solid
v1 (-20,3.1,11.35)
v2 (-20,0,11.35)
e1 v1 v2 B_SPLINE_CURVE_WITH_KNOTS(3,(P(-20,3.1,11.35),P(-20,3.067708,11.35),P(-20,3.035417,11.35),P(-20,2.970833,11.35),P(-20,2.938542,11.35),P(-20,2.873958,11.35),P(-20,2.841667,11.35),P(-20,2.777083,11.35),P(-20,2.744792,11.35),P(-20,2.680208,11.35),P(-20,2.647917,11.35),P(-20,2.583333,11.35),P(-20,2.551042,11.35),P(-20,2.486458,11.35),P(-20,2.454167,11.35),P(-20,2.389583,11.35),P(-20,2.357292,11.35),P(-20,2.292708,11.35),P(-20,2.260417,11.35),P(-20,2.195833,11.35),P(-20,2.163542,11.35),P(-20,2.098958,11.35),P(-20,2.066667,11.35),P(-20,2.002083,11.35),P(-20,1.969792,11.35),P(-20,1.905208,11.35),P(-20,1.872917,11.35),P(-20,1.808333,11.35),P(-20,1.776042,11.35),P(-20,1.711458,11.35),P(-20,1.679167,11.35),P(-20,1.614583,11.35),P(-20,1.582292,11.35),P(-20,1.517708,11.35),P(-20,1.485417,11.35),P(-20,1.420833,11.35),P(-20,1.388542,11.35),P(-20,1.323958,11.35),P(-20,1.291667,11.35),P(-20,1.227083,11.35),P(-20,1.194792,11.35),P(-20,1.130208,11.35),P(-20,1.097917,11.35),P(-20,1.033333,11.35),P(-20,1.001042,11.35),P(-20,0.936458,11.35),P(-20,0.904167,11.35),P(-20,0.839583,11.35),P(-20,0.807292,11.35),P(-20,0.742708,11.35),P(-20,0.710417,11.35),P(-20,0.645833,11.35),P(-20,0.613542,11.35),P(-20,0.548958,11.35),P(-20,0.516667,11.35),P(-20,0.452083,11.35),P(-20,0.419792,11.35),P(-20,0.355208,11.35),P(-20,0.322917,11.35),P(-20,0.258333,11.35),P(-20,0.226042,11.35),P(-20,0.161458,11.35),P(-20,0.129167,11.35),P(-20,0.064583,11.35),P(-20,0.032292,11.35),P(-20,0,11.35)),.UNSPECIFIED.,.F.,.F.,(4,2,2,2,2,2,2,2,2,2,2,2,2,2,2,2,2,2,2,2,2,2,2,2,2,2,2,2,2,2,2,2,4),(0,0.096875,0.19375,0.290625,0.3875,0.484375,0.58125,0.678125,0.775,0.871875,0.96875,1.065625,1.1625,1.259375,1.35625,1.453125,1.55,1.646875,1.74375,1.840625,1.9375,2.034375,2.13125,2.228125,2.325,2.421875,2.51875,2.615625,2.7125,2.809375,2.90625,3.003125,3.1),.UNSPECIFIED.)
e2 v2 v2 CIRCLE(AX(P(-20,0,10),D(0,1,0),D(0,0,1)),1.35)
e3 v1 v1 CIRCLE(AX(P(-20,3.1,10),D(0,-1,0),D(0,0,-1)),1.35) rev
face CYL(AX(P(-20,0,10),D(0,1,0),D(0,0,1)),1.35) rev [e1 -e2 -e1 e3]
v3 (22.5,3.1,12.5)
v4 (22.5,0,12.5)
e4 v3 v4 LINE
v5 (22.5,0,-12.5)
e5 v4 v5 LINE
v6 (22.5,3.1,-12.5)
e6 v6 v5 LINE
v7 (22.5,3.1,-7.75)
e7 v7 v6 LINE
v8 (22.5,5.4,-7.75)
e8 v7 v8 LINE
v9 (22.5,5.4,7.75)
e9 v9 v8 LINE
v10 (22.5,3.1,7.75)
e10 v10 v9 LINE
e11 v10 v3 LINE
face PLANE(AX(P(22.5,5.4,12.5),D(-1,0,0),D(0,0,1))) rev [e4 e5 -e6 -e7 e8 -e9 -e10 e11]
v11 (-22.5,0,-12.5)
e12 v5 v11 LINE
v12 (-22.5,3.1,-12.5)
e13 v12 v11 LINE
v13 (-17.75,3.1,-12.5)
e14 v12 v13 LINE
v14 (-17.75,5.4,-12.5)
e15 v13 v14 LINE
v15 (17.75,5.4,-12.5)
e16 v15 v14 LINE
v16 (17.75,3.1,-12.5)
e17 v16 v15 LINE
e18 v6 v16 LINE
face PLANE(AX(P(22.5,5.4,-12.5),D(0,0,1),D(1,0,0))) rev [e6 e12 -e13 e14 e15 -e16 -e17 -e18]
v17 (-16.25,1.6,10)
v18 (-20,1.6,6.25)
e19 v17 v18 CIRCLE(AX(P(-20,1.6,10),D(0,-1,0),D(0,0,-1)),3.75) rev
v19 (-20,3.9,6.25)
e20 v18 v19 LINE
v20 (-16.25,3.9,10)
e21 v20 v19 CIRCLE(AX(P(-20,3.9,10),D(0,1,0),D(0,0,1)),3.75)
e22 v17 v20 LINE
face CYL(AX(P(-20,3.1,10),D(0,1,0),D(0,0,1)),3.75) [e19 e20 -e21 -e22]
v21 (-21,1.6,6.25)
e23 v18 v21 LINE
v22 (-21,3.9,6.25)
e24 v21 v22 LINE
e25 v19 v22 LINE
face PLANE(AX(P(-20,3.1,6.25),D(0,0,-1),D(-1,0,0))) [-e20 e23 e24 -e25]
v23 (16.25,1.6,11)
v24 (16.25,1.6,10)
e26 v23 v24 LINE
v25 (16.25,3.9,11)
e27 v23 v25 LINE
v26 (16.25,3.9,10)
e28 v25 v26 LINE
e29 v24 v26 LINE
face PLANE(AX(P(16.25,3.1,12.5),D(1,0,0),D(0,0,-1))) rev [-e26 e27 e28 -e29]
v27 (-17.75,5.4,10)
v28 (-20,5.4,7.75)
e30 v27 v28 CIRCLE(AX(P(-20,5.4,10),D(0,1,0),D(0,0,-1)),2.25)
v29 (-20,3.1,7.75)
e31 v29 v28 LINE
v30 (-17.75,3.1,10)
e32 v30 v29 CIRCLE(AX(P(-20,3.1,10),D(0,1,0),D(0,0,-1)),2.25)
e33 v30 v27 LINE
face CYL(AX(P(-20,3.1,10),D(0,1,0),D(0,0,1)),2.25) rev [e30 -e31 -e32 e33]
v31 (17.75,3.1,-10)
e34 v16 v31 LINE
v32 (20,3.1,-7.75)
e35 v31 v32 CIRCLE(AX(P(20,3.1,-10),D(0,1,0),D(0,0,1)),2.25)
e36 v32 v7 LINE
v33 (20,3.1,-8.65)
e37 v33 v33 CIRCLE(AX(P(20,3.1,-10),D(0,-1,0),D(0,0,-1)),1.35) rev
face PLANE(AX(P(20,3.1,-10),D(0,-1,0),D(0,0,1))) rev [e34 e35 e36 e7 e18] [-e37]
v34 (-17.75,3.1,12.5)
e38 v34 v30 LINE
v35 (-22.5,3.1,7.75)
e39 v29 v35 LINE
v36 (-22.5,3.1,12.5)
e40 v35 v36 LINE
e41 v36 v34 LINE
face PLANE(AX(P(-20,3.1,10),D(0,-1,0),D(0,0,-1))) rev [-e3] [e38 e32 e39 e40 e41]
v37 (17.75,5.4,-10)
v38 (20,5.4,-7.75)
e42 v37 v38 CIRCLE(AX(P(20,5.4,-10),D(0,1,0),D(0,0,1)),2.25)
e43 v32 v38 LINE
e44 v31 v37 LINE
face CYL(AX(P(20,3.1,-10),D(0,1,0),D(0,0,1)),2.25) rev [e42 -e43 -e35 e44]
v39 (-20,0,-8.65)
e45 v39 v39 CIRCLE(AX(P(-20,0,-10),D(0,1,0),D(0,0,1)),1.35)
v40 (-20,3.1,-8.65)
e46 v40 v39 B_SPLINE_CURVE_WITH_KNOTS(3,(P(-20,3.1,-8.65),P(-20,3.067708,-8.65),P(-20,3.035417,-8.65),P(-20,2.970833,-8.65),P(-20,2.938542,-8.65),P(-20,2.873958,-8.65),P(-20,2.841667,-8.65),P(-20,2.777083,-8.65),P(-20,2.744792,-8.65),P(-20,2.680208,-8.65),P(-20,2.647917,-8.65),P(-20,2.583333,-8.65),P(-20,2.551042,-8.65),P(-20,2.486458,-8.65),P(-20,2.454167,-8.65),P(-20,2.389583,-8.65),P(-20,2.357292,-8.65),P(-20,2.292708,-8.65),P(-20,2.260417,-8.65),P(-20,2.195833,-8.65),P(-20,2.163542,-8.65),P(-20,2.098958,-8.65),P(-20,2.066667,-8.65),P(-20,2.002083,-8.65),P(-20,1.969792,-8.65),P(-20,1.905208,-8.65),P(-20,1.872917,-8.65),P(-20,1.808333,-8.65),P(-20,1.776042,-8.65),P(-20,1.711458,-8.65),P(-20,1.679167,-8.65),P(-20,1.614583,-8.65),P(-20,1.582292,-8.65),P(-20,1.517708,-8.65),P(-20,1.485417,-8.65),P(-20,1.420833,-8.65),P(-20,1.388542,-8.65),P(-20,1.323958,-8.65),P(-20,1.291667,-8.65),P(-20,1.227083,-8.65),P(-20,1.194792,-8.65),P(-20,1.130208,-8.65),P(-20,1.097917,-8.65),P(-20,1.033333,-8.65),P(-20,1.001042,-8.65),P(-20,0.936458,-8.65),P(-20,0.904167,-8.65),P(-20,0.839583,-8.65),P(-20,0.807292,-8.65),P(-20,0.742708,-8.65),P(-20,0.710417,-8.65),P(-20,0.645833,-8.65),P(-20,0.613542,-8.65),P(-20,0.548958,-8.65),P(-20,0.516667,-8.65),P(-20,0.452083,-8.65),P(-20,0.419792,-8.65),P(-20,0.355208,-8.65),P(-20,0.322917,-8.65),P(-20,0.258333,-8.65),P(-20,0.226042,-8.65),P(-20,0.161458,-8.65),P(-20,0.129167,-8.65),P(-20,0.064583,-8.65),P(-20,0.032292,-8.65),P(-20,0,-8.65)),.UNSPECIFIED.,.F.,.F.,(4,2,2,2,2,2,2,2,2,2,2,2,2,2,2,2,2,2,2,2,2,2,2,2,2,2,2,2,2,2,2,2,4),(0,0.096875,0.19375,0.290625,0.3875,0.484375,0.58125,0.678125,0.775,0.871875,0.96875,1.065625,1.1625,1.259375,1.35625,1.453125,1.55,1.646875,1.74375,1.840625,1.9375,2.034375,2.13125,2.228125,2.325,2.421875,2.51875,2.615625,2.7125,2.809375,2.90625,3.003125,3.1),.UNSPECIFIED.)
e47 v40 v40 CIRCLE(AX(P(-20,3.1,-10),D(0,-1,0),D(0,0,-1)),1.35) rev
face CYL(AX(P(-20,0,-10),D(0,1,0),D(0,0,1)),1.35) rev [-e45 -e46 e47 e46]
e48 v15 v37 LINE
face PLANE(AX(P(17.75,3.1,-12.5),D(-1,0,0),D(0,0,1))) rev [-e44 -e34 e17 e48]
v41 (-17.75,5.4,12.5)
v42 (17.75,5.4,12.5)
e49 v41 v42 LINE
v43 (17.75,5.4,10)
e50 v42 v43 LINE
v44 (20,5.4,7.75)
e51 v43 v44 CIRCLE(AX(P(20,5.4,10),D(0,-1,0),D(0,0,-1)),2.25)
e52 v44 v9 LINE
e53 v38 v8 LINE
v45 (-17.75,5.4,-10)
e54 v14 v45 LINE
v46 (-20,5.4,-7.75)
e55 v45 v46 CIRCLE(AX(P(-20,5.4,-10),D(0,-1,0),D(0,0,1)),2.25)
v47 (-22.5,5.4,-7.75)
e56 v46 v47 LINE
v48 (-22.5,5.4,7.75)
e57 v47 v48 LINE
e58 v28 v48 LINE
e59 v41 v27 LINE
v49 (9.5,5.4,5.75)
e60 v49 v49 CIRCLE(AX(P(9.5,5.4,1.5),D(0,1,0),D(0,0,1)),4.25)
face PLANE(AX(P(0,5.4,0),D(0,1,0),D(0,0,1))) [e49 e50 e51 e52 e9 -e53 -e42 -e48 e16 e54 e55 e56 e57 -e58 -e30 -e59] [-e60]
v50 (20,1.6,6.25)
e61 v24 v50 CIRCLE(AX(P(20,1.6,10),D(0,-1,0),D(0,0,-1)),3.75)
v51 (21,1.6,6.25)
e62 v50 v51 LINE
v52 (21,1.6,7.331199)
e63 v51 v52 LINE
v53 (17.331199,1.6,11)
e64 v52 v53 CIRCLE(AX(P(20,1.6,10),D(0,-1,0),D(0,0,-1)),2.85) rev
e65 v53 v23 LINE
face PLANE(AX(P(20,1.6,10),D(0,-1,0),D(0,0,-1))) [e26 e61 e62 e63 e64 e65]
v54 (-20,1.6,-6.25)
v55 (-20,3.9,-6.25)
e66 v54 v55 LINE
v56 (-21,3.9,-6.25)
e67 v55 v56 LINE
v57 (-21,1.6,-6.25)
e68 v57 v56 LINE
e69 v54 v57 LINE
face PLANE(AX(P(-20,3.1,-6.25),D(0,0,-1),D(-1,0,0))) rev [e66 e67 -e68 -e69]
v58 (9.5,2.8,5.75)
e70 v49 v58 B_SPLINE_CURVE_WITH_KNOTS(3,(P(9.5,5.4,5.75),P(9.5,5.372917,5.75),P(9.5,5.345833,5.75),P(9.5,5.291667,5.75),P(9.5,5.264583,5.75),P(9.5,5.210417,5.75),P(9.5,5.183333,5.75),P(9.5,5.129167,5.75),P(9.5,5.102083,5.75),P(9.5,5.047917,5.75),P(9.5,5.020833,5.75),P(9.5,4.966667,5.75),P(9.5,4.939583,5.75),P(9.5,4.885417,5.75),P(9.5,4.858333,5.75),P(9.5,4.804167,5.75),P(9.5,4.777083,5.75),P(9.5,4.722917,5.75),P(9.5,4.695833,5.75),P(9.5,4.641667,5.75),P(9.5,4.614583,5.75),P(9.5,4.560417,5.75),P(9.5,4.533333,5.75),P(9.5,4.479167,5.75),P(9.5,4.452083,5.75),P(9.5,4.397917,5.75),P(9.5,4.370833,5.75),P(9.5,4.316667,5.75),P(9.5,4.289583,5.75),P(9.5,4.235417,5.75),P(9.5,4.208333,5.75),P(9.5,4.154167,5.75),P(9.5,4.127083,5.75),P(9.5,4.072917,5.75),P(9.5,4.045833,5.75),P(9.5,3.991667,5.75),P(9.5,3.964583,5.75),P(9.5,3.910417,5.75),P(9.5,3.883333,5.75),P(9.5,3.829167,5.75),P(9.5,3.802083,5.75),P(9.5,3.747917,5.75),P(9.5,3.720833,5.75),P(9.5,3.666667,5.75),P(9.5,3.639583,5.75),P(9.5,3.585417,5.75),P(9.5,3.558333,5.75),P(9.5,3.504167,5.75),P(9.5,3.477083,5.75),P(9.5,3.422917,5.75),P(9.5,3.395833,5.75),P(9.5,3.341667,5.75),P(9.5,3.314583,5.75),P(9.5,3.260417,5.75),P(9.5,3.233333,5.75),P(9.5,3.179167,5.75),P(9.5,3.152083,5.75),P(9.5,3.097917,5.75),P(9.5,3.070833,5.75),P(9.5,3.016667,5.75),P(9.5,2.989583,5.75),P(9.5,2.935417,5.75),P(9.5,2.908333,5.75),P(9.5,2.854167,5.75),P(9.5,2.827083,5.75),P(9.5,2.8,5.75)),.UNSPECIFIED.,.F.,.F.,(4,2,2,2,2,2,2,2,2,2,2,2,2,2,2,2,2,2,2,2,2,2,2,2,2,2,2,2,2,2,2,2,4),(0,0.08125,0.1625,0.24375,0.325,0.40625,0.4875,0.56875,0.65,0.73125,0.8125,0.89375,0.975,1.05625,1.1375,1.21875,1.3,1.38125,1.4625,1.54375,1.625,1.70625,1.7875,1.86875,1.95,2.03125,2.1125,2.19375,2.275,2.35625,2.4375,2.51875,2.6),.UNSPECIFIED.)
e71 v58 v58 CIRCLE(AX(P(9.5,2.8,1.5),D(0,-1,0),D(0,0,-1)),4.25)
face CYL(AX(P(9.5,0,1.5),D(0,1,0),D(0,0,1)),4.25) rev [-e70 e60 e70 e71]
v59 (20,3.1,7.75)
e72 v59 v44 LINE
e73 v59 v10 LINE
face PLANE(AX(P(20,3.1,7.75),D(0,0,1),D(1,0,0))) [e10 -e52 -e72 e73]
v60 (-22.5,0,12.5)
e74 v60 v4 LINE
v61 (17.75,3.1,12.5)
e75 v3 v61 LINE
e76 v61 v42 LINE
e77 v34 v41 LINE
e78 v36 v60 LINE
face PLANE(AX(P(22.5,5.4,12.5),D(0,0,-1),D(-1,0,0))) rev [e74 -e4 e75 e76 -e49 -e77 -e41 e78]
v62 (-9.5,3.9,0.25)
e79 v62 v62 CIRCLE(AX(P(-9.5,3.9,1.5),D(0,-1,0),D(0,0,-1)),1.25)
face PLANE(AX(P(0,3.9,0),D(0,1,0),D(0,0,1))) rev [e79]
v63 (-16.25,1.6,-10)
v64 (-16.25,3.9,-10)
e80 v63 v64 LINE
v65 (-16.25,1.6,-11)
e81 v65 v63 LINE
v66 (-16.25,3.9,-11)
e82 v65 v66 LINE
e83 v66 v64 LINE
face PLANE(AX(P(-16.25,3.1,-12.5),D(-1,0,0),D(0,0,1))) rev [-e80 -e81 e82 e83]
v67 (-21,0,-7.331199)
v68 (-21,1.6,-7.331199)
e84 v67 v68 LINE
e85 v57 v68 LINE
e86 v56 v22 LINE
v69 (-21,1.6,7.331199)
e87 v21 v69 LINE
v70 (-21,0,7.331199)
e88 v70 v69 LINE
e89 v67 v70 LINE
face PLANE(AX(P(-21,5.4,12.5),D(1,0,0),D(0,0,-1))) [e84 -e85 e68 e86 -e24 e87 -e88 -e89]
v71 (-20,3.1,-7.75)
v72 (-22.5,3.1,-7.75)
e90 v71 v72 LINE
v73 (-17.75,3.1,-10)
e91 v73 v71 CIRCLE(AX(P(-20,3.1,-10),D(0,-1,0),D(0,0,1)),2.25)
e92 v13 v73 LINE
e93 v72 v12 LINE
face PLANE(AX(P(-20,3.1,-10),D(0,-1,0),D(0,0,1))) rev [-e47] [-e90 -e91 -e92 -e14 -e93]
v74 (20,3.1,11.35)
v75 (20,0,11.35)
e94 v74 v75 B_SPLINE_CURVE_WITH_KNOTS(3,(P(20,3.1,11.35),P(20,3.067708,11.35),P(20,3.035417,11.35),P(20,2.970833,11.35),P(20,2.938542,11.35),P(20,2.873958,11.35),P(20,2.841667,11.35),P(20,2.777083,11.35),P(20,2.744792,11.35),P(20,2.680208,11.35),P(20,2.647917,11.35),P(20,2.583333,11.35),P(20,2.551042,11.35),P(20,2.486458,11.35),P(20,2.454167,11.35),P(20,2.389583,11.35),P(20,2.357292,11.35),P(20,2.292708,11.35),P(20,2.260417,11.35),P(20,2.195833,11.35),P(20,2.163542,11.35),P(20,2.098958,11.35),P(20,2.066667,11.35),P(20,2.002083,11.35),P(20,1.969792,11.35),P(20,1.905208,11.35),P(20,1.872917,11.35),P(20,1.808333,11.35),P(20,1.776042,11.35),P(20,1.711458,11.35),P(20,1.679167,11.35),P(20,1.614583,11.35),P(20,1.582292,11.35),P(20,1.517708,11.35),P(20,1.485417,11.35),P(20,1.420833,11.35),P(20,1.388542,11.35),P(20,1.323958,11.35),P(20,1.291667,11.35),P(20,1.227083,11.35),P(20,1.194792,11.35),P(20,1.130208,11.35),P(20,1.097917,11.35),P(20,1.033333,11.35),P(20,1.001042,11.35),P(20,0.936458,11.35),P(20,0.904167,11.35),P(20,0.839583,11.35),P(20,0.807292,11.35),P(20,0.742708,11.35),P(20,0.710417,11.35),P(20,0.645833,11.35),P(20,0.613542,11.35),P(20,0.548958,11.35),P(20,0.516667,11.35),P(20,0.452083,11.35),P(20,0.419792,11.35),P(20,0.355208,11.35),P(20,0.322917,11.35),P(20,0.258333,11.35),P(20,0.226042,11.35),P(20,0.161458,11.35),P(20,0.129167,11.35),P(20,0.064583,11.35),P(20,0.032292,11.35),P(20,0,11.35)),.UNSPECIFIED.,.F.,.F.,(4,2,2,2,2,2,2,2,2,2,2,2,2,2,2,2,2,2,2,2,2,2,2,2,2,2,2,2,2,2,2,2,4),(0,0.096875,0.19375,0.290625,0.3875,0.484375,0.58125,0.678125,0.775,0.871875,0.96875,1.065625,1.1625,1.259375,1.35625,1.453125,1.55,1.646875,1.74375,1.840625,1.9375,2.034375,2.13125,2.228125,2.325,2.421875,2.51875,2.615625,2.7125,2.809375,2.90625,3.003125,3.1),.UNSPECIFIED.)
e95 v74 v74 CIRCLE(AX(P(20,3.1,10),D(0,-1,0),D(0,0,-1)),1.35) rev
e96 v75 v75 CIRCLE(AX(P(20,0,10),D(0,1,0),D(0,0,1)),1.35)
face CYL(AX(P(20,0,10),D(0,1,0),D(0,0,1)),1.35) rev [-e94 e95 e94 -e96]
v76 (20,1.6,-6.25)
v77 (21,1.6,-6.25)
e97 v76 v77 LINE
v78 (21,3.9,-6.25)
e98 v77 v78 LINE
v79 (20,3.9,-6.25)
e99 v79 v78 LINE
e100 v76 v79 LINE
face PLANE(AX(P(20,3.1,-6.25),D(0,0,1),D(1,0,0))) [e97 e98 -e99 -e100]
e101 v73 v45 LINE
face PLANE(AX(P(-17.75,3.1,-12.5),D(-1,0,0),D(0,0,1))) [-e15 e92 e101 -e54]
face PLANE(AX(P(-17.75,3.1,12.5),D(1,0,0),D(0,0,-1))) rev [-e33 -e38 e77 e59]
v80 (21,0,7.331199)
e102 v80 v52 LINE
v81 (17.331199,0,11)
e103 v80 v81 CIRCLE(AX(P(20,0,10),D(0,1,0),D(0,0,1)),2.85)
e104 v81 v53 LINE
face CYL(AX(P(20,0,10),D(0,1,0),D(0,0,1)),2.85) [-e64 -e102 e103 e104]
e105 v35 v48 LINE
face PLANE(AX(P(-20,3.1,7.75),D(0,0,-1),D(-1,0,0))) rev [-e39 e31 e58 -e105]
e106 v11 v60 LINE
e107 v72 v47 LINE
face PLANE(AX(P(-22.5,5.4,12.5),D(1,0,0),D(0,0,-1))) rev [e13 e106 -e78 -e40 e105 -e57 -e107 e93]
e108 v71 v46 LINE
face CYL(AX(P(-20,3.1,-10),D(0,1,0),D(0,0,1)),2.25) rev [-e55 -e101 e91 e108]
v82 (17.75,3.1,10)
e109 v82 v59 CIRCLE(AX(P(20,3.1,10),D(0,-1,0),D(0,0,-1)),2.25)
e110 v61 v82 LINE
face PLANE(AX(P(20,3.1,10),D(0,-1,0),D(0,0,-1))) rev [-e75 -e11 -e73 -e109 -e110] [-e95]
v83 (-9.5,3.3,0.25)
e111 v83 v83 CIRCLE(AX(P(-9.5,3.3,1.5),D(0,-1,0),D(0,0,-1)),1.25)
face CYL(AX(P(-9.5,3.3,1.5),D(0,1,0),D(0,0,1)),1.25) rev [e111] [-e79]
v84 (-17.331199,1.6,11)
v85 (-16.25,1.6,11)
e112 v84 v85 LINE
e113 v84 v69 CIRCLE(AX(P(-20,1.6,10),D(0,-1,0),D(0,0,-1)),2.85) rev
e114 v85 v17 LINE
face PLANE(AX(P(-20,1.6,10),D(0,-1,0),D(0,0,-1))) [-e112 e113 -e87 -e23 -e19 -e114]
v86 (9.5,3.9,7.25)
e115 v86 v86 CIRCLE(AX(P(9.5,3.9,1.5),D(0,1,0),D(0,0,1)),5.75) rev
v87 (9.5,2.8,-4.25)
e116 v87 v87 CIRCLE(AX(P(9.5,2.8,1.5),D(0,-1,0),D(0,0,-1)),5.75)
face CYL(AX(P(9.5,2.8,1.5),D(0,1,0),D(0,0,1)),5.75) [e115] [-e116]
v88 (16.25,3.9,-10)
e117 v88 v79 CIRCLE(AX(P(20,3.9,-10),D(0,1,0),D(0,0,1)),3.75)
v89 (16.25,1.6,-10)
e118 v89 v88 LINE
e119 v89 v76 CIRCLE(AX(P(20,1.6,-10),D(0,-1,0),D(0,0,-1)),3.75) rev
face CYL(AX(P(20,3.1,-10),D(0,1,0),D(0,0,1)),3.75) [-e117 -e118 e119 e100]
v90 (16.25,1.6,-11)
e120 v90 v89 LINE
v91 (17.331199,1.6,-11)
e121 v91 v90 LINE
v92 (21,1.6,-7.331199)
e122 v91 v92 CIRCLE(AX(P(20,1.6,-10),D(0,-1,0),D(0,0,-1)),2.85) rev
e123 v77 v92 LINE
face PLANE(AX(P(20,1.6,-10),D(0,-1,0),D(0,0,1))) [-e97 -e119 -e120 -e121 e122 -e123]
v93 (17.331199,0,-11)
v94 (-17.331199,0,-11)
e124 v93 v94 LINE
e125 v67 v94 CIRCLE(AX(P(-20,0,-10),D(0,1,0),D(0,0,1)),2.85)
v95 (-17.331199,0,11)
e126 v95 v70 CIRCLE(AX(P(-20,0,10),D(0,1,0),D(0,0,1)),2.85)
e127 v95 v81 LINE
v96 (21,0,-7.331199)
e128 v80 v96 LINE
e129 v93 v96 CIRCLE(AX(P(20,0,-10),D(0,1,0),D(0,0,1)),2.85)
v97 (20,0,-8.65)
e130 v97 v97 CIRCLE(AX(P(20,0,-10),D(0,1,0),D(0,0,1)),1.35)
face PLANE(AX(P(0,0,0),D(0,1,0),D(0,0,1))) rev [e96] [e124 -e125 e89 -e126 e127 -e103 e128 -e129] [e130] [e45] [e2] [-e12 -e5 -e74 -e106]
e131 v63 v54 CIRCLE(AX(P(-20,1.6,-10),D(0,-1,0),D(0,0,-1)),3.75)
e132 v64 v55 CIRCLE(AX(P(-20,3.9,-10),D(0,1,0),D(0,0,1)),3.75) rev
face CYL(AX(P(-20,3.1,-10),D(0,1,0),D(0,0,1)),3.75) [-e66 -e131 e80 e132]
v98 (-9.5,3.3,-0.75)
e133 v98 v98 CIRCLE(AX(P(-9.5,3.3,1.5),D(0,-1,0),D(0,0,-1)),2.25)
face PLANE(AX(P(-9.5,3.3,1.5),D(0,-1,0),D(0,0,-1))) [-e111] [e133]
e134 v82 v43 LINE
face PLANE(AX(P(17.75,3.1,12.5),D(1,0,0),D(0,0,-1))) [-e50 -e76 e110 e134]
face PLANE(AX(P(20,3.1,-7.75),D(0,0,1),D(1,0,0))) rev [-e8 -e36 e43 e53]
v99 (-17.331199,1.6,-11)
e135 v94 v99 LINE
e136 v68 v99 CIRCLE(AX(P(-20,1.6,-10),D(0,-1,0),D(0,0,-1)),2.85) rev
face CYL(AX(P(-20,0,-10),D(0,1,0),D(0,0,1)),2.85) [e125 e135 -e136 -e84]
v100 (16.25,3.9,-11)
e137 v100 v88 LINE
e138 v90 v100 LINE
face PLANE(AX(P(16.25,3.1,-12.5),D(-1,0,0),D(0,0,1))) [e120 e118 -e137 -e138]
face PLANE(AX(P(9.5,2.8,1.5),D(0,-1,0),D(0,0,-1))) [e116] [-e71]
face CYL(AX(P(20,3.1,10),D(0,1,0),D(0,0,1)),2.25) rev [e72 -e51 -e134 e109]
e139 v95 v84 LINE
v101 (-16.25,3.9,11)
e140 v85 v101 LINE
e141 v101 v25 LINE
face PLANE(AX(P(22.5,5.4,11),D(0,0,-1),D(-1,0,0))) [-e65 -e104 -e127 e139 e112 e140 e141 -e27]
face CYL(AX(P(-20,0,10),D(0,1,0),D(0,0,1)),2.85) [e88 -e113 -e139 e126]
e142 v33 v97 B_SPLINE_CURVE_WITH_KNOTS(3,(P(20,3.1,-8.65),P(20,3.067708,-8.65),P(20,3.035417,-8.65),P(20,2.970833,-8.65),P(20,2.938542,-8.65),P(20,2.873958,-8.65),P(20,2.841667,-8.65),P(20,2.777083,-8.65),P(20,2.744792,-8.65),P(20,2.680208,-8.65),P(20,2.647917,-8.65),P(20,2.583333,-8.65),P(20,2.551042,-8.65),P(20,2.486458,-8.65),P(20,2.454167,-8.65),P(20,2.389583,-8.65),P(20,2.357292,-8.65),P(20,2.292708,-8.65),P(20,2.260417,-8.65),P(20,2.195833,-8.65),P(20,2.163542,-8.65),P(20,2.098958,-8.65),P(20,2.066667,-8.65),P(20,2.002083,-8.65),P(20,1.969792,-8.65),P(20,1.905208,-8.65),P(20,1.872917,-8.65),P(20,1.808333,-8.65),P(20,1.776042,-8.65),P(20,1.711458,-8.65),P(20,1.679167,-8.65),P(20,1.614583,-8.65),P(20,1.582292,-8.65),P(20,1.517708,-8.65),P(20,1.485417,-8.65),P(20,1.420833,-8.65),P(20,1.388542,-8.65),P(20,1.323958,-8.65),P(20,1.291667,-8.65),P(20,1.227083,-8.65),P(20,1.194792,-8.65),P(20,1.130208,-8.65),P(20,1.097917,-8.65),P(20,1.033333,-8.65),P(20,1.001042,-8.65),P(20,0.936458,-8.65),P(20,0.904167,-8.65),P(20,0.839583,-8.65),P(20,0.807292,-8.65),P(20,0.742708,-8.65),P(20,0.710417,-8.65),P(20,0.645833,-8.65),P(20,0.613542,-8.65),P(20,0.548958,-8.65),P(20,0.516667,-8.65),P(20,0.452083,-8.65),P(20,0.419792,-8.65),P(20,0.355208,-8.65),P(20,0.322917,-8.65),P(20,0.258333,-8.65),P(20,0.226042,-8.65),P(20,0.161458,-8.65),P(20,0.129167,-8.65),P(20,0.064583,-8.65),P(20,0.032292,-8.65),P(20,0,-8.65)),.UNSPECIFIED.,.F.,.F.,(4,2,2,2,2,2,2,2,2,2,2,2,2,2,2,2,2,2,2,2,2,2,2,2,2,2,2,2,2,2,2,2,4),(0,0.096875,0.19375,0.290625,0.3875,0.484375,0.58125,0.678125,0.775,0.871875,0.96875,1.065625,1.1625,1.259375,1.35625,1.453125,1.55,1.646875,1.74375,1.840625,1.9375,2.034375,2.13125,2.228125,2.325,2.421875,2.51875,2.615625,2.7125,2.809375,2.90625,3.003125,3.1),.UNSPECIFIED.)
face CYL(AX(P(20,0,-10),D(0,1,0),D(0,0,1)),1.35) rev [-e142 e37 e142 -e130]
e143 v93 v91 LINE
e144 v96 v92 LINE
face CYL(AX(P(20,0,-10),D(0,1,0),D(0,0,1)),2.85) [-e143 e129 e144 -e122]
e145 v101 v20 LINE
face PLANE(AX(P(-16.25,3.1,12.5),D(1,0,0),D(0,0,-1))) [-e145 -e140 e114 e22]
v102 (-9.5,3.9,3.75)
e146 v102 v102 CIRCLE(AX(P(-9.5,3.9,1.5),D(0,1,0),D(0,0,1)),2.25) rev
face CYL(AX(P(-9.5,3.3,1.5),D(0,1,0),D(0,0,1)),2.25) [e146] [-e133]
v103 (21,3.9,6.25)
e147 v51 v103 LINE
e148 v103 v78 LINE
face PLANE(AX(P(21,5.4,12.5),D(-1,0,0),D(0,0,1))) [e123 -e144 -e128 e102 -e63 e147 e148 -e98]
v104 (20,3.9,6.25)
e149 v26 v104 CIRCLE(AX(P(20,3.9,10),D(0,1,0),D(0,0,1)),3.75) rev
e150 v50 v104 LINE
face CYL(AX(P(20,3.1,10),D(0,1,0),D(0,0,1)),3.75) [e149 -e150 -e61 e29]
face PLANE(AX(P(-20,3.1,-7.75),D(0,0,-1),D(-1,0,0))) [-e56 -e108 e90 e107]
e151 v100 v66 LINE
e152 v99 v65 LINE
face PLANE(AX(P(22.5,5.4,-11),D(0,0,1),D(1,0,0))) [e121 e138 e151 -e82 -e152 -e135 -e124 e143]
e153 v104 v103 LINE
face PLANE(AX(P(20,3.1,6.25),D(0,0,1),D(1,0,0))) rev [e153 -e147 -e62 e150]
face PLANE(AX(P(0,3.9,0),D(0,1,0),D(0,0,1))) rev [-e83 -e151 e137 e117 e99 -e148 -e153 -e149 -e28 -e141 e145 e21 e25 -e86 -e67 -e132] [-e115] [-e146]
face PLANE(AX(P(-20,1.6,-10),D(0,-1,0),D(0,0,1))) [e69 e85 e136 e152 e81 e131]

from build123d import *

# Parameters (mm, degrees)
SKETCH_1_W            = 45
SKETCH_1_H            = 25
EXTRUDE_1_DEPTH       = 5.4
SKETCH_2_R            = 1.35
CUT_EXTRUDE_1_DEPTH   = 27.299429652
CUT_EXTRUDE_2_DEPTH   = 2.3
MIRROR_2_COPY_1_DEPTH = 2.3
SHELL_1_DEPTH         = 3.9
SHELL_1_2_DEPTH       = 1.6
SKETCH_4_R            = 4.25
CUT_EXTRUDE_3_DEPTH   = 27.299429652
SKETCH_6_R            = 5.75
SKETCH_6_R_2          = 4.25
EXTRUDE_3_DEPTH       = 1.1
SKETCH_7_R            = 2.25
SKETCH_7_R_2          = 1.25
EXTRUDE_4_DEPTH       = 0.6


# Read off the part's stored shape, not the designer's step: 薄殼1
with BuildPart() as part:
    # 草圖1 → 填料-伸長1 (new body)
    with BuildSketch(Plane(origin=(0, 0, 0), x_dir=(1, 0, 0), z_dir=(0, 1, 0))):
        Rectangle(SKETCH_1_W, SKETCH_1_H)
    extrude(amount=EXTRUDE_1_DEPTH)

    # 草圖2 → 除料-伸長1 (cut, through all)
    with BuildSketch(Plane(origin=(0, 5.4, 0), x_dir=(1, 0, 0), z_dir=(0, 1, 0))):
        with Locations(Location((-20, 10, 0), (0, 0, 270))):
            Circle(SKETCH_2_R)
        with Locations(Location((-20, -10, 0), (0, 0, 270))):
            Circle(SKETCH_2_R)
        with Locations(Location((20, -10, 0), (0, 0, 270))):
            Circle(SKETCH_2_R)
        with Locations(Location((20, 10, 0), (0, 0, 270))):
            Circle(SKETCH_2_R)
    extrude(amount=-CUT_EXTRUDE_1_DEPTH, mode=Mode.SUBTRACT)

    # 草圖3 → 除料-伸長2 (cut)
    with BuildSketch(Plane(origin=(0, 5.4, 0), x_dir=(1, 0, 0), z_dir=(0, 1, 0))):
        with BuildLine():
            Line((-20, -7.75), (-22.5, -7.75))
            Line((-22.5, -7.75), (-22.5, -12.5))
            Line((-22.5, -12.5), (-17.75, -12.5))
            Line((-17.75, -12.5), (-17.75, -10))
            ThreePointArc((-17.75, -10), (-18.409009742, -8.409009742), (-20, -7.75))
        make_face()
    cut_extrude_2 = extrude(amount=-CUT_EXTRUDE_2_DEPTH, mode=Mode.SUBTRACT)

    # 鏡射1: 除料-伸長2 across plane
    add(cut_extrude_2.mirror(Plane.XY), mode=Mode.SUBTRACT)

    # 鏡射2: 除料-伸長2 across plane
    add(cut_extrude_2.mirror(Plane(origin=(0, 0, 0), x_dir=(0, 0, 1), z_dir=(1, 0, 0))), mode=Mode.SUBTRACT)

    # 鏡射2 copy 1 sketch → 鏡射2 copy 1 (cut)
    with BuildSketch(Plane(origin=(0, 5.4, 0), x_dir=(-1, 0, 0), z_dir=(0, 1, 0))):
        with BuildLine():
            Line((-20, -7.75), (-22.5, -7.75))
            Line((-22.5, -7.75), (-22.5, -12.5))
            Line((-22.5, -12.5), (-17.75, -12.5))
            Line((-17.75, -12.5), (-17.75, -10))
            ThreePointArc((-17.75, -10), (-18.409009742, -8.409009742), (-20, -7.75))
        make_face()
    extrude(amount=-MIRROR_2_COPY_1_DEPTH, mode=Mode.SUBTRACT)

    # 薄殼1 outline → 薄殼1 (cut)
    with BuildSketch(Plane(origin=(0, 0, 0), x_dir=(1, 0, 0), z_dir=(0, 1, 0))):
        with BuildLine():
            Line((-16.25, -11), (16.25, -11))
            Line((16.25, -11), (16.25, -10))
            ThreePointArc((16.25, -10), (17.348349571, -7.348349571), (20, -6.25))
            Line((20, -6.25), (21, -6.25))
            Line((21, -6.25), (21, 6.25))
            Line((21, 6.25), (20, 6.25))
            ThreePointArc((20, 6.25), (17.348349571, 7.348349571), (16.25, 10))
            Line((16.25, 10), (16.25, 11))
            Line((16.25, 11), (-16.25, 11))
            Line((-16.25, 11), (-16.25, 10))
            ThreePointArc((-16.25, 10), (-17.348349571, 7.348349571), (-20, 6.25))
            Line((-20, 6.25), (-21, 6.25))
            Line((-21, 6.25), (-21, -6.25))
            Line((-21, -6.25), (-20, -6.25))
            ThreePointArc((-20, -6.25), (-17.348349571, -7.348349571), (-16.25, -10))
            Line((-16.25, -10), (-16.25, -11))
        make_face()
    extrude(amount=SHELL_1_DEPTH, mode=Mode.SUBTRACT)

    # Shell 1 2 outline → Shell 1 2 (cut)
    with BuildSketch(Plane(origin=(0, 0, 0), x_dir=(1, 0, 0), z_dir=(0, 1, 0))):
        with BuildLine():
            Line((16.25, -11), (17.331198771, -11))
            ThreePointArc((17.331198771, -11), (17.984745674, -7.984745674), (21, -7.331198771))
            Line((21, -7.331198771), (21, -6.25))
            Line((21, -6.25), (20, -6.25))
            ThreePointArc((20, -6.25), (17.348349571, -7.348349571), (16.25, -10))
            Line((16.25, -10), (16.25, -11))
        make_face()
        with BuildLine():
            Line((-17.331198771, -11), (-16.25, -11))
            Line((-16.25, -11), (-16.25, -10))
            ThreePointArc((-16.25, -10), (-17.348349571, -7.348349571), (-20, -6.25))
            Line((-20, -6.25), (-21, -6.25))
            Line((-21, -6.25), (-21, -7.331198771))
            ThreePointArc((-21, -7.331198771), (-17.984745674, -7.984745674), (-17.331198771, -11))
        make_face()
        with BuildLine():
            Line((20, 6.25), (21, 6.25))
            Line((21, 6.25), (21, 7.331198771))
            ThreePointArc((21, 7.331198771), (17.984745674, 7.984745674), (17.331198771, 11))
            Line((17.331198771, 11), (16.25, 11))
            Line((16.25, 11), (16.25, 10))
            ThreePointArc((16.25, 10), (17.348349571, 7.348349571), (20, 6.25))
        make_face()
        with BuildLine():
            Line((-21, 7.331198771), (-21, 6.25))
            Line((-21, 6.25), (-20, 6.25))
            ThreePointArc((-20, 6.25), (-17.348349571, 7.348349571), (-16.25, 10))
            Line((-16.25, 10), (-16.25, 11))
            Line((-16.25, 11), (-17.331198771, 11))
            ThreePointArc((-17.331198771, 11), (-17.984745674, 7.984745674), (-21, 7.331198771))
        make_face()
    extrude(amount=SHELL_1_2_DEPTH, mode=Mode.SUBTRACT)

    # 草圖4 → 除料-伸長3 (cut, through all)
    with BuildSketch(Plane(origin=(0, 5.4, 0), x_dir=(1, 0, 0), z_dir=(0, 1, 0))):
        with Locations(Location((9.5, -1.5, 0), (0, 0, 270))):
            Circle(SKETCH_4_R)
    extrude(amount=-CUT_EXTRUDE_3_DEPTH, mode=Mode.SUBTRACT)

    # 草圖6 → 填料-伸長3 (add)
    with BuildSketch(Plane.XZ.offset(-3.9)):
        with Locations(Location((9.5, 1.5, 0), (0, 0, 90))):
            Circle(SKETCH_6_R)
        with Locations(Location((9.5, 1.5, 0), (0, 0, 90))):
            Circle(SKETCH_6_R_2, mode=Mode.SUBTRACT)
    extrude(amount=EXTRUDE_3_DEPTH)

    # 草圖7 → 填料-伸長4 (add)
    with BuildSketch(Plane.XZ.offset(-3.9)):
        with Locations(Location((-9.5, 1.5, 0), (0, 0, 90))):
            Circle(SKETCH_7_R)
        with Locations(Location((-9.5, 1.5, 0), (0, 0, 270))):
            Circle(SKETCH_7_R_2, mode=Mode.SUBTRACT)
    extrude(amount=EXTRUDE_4_DEPTH)


solid = part.part
